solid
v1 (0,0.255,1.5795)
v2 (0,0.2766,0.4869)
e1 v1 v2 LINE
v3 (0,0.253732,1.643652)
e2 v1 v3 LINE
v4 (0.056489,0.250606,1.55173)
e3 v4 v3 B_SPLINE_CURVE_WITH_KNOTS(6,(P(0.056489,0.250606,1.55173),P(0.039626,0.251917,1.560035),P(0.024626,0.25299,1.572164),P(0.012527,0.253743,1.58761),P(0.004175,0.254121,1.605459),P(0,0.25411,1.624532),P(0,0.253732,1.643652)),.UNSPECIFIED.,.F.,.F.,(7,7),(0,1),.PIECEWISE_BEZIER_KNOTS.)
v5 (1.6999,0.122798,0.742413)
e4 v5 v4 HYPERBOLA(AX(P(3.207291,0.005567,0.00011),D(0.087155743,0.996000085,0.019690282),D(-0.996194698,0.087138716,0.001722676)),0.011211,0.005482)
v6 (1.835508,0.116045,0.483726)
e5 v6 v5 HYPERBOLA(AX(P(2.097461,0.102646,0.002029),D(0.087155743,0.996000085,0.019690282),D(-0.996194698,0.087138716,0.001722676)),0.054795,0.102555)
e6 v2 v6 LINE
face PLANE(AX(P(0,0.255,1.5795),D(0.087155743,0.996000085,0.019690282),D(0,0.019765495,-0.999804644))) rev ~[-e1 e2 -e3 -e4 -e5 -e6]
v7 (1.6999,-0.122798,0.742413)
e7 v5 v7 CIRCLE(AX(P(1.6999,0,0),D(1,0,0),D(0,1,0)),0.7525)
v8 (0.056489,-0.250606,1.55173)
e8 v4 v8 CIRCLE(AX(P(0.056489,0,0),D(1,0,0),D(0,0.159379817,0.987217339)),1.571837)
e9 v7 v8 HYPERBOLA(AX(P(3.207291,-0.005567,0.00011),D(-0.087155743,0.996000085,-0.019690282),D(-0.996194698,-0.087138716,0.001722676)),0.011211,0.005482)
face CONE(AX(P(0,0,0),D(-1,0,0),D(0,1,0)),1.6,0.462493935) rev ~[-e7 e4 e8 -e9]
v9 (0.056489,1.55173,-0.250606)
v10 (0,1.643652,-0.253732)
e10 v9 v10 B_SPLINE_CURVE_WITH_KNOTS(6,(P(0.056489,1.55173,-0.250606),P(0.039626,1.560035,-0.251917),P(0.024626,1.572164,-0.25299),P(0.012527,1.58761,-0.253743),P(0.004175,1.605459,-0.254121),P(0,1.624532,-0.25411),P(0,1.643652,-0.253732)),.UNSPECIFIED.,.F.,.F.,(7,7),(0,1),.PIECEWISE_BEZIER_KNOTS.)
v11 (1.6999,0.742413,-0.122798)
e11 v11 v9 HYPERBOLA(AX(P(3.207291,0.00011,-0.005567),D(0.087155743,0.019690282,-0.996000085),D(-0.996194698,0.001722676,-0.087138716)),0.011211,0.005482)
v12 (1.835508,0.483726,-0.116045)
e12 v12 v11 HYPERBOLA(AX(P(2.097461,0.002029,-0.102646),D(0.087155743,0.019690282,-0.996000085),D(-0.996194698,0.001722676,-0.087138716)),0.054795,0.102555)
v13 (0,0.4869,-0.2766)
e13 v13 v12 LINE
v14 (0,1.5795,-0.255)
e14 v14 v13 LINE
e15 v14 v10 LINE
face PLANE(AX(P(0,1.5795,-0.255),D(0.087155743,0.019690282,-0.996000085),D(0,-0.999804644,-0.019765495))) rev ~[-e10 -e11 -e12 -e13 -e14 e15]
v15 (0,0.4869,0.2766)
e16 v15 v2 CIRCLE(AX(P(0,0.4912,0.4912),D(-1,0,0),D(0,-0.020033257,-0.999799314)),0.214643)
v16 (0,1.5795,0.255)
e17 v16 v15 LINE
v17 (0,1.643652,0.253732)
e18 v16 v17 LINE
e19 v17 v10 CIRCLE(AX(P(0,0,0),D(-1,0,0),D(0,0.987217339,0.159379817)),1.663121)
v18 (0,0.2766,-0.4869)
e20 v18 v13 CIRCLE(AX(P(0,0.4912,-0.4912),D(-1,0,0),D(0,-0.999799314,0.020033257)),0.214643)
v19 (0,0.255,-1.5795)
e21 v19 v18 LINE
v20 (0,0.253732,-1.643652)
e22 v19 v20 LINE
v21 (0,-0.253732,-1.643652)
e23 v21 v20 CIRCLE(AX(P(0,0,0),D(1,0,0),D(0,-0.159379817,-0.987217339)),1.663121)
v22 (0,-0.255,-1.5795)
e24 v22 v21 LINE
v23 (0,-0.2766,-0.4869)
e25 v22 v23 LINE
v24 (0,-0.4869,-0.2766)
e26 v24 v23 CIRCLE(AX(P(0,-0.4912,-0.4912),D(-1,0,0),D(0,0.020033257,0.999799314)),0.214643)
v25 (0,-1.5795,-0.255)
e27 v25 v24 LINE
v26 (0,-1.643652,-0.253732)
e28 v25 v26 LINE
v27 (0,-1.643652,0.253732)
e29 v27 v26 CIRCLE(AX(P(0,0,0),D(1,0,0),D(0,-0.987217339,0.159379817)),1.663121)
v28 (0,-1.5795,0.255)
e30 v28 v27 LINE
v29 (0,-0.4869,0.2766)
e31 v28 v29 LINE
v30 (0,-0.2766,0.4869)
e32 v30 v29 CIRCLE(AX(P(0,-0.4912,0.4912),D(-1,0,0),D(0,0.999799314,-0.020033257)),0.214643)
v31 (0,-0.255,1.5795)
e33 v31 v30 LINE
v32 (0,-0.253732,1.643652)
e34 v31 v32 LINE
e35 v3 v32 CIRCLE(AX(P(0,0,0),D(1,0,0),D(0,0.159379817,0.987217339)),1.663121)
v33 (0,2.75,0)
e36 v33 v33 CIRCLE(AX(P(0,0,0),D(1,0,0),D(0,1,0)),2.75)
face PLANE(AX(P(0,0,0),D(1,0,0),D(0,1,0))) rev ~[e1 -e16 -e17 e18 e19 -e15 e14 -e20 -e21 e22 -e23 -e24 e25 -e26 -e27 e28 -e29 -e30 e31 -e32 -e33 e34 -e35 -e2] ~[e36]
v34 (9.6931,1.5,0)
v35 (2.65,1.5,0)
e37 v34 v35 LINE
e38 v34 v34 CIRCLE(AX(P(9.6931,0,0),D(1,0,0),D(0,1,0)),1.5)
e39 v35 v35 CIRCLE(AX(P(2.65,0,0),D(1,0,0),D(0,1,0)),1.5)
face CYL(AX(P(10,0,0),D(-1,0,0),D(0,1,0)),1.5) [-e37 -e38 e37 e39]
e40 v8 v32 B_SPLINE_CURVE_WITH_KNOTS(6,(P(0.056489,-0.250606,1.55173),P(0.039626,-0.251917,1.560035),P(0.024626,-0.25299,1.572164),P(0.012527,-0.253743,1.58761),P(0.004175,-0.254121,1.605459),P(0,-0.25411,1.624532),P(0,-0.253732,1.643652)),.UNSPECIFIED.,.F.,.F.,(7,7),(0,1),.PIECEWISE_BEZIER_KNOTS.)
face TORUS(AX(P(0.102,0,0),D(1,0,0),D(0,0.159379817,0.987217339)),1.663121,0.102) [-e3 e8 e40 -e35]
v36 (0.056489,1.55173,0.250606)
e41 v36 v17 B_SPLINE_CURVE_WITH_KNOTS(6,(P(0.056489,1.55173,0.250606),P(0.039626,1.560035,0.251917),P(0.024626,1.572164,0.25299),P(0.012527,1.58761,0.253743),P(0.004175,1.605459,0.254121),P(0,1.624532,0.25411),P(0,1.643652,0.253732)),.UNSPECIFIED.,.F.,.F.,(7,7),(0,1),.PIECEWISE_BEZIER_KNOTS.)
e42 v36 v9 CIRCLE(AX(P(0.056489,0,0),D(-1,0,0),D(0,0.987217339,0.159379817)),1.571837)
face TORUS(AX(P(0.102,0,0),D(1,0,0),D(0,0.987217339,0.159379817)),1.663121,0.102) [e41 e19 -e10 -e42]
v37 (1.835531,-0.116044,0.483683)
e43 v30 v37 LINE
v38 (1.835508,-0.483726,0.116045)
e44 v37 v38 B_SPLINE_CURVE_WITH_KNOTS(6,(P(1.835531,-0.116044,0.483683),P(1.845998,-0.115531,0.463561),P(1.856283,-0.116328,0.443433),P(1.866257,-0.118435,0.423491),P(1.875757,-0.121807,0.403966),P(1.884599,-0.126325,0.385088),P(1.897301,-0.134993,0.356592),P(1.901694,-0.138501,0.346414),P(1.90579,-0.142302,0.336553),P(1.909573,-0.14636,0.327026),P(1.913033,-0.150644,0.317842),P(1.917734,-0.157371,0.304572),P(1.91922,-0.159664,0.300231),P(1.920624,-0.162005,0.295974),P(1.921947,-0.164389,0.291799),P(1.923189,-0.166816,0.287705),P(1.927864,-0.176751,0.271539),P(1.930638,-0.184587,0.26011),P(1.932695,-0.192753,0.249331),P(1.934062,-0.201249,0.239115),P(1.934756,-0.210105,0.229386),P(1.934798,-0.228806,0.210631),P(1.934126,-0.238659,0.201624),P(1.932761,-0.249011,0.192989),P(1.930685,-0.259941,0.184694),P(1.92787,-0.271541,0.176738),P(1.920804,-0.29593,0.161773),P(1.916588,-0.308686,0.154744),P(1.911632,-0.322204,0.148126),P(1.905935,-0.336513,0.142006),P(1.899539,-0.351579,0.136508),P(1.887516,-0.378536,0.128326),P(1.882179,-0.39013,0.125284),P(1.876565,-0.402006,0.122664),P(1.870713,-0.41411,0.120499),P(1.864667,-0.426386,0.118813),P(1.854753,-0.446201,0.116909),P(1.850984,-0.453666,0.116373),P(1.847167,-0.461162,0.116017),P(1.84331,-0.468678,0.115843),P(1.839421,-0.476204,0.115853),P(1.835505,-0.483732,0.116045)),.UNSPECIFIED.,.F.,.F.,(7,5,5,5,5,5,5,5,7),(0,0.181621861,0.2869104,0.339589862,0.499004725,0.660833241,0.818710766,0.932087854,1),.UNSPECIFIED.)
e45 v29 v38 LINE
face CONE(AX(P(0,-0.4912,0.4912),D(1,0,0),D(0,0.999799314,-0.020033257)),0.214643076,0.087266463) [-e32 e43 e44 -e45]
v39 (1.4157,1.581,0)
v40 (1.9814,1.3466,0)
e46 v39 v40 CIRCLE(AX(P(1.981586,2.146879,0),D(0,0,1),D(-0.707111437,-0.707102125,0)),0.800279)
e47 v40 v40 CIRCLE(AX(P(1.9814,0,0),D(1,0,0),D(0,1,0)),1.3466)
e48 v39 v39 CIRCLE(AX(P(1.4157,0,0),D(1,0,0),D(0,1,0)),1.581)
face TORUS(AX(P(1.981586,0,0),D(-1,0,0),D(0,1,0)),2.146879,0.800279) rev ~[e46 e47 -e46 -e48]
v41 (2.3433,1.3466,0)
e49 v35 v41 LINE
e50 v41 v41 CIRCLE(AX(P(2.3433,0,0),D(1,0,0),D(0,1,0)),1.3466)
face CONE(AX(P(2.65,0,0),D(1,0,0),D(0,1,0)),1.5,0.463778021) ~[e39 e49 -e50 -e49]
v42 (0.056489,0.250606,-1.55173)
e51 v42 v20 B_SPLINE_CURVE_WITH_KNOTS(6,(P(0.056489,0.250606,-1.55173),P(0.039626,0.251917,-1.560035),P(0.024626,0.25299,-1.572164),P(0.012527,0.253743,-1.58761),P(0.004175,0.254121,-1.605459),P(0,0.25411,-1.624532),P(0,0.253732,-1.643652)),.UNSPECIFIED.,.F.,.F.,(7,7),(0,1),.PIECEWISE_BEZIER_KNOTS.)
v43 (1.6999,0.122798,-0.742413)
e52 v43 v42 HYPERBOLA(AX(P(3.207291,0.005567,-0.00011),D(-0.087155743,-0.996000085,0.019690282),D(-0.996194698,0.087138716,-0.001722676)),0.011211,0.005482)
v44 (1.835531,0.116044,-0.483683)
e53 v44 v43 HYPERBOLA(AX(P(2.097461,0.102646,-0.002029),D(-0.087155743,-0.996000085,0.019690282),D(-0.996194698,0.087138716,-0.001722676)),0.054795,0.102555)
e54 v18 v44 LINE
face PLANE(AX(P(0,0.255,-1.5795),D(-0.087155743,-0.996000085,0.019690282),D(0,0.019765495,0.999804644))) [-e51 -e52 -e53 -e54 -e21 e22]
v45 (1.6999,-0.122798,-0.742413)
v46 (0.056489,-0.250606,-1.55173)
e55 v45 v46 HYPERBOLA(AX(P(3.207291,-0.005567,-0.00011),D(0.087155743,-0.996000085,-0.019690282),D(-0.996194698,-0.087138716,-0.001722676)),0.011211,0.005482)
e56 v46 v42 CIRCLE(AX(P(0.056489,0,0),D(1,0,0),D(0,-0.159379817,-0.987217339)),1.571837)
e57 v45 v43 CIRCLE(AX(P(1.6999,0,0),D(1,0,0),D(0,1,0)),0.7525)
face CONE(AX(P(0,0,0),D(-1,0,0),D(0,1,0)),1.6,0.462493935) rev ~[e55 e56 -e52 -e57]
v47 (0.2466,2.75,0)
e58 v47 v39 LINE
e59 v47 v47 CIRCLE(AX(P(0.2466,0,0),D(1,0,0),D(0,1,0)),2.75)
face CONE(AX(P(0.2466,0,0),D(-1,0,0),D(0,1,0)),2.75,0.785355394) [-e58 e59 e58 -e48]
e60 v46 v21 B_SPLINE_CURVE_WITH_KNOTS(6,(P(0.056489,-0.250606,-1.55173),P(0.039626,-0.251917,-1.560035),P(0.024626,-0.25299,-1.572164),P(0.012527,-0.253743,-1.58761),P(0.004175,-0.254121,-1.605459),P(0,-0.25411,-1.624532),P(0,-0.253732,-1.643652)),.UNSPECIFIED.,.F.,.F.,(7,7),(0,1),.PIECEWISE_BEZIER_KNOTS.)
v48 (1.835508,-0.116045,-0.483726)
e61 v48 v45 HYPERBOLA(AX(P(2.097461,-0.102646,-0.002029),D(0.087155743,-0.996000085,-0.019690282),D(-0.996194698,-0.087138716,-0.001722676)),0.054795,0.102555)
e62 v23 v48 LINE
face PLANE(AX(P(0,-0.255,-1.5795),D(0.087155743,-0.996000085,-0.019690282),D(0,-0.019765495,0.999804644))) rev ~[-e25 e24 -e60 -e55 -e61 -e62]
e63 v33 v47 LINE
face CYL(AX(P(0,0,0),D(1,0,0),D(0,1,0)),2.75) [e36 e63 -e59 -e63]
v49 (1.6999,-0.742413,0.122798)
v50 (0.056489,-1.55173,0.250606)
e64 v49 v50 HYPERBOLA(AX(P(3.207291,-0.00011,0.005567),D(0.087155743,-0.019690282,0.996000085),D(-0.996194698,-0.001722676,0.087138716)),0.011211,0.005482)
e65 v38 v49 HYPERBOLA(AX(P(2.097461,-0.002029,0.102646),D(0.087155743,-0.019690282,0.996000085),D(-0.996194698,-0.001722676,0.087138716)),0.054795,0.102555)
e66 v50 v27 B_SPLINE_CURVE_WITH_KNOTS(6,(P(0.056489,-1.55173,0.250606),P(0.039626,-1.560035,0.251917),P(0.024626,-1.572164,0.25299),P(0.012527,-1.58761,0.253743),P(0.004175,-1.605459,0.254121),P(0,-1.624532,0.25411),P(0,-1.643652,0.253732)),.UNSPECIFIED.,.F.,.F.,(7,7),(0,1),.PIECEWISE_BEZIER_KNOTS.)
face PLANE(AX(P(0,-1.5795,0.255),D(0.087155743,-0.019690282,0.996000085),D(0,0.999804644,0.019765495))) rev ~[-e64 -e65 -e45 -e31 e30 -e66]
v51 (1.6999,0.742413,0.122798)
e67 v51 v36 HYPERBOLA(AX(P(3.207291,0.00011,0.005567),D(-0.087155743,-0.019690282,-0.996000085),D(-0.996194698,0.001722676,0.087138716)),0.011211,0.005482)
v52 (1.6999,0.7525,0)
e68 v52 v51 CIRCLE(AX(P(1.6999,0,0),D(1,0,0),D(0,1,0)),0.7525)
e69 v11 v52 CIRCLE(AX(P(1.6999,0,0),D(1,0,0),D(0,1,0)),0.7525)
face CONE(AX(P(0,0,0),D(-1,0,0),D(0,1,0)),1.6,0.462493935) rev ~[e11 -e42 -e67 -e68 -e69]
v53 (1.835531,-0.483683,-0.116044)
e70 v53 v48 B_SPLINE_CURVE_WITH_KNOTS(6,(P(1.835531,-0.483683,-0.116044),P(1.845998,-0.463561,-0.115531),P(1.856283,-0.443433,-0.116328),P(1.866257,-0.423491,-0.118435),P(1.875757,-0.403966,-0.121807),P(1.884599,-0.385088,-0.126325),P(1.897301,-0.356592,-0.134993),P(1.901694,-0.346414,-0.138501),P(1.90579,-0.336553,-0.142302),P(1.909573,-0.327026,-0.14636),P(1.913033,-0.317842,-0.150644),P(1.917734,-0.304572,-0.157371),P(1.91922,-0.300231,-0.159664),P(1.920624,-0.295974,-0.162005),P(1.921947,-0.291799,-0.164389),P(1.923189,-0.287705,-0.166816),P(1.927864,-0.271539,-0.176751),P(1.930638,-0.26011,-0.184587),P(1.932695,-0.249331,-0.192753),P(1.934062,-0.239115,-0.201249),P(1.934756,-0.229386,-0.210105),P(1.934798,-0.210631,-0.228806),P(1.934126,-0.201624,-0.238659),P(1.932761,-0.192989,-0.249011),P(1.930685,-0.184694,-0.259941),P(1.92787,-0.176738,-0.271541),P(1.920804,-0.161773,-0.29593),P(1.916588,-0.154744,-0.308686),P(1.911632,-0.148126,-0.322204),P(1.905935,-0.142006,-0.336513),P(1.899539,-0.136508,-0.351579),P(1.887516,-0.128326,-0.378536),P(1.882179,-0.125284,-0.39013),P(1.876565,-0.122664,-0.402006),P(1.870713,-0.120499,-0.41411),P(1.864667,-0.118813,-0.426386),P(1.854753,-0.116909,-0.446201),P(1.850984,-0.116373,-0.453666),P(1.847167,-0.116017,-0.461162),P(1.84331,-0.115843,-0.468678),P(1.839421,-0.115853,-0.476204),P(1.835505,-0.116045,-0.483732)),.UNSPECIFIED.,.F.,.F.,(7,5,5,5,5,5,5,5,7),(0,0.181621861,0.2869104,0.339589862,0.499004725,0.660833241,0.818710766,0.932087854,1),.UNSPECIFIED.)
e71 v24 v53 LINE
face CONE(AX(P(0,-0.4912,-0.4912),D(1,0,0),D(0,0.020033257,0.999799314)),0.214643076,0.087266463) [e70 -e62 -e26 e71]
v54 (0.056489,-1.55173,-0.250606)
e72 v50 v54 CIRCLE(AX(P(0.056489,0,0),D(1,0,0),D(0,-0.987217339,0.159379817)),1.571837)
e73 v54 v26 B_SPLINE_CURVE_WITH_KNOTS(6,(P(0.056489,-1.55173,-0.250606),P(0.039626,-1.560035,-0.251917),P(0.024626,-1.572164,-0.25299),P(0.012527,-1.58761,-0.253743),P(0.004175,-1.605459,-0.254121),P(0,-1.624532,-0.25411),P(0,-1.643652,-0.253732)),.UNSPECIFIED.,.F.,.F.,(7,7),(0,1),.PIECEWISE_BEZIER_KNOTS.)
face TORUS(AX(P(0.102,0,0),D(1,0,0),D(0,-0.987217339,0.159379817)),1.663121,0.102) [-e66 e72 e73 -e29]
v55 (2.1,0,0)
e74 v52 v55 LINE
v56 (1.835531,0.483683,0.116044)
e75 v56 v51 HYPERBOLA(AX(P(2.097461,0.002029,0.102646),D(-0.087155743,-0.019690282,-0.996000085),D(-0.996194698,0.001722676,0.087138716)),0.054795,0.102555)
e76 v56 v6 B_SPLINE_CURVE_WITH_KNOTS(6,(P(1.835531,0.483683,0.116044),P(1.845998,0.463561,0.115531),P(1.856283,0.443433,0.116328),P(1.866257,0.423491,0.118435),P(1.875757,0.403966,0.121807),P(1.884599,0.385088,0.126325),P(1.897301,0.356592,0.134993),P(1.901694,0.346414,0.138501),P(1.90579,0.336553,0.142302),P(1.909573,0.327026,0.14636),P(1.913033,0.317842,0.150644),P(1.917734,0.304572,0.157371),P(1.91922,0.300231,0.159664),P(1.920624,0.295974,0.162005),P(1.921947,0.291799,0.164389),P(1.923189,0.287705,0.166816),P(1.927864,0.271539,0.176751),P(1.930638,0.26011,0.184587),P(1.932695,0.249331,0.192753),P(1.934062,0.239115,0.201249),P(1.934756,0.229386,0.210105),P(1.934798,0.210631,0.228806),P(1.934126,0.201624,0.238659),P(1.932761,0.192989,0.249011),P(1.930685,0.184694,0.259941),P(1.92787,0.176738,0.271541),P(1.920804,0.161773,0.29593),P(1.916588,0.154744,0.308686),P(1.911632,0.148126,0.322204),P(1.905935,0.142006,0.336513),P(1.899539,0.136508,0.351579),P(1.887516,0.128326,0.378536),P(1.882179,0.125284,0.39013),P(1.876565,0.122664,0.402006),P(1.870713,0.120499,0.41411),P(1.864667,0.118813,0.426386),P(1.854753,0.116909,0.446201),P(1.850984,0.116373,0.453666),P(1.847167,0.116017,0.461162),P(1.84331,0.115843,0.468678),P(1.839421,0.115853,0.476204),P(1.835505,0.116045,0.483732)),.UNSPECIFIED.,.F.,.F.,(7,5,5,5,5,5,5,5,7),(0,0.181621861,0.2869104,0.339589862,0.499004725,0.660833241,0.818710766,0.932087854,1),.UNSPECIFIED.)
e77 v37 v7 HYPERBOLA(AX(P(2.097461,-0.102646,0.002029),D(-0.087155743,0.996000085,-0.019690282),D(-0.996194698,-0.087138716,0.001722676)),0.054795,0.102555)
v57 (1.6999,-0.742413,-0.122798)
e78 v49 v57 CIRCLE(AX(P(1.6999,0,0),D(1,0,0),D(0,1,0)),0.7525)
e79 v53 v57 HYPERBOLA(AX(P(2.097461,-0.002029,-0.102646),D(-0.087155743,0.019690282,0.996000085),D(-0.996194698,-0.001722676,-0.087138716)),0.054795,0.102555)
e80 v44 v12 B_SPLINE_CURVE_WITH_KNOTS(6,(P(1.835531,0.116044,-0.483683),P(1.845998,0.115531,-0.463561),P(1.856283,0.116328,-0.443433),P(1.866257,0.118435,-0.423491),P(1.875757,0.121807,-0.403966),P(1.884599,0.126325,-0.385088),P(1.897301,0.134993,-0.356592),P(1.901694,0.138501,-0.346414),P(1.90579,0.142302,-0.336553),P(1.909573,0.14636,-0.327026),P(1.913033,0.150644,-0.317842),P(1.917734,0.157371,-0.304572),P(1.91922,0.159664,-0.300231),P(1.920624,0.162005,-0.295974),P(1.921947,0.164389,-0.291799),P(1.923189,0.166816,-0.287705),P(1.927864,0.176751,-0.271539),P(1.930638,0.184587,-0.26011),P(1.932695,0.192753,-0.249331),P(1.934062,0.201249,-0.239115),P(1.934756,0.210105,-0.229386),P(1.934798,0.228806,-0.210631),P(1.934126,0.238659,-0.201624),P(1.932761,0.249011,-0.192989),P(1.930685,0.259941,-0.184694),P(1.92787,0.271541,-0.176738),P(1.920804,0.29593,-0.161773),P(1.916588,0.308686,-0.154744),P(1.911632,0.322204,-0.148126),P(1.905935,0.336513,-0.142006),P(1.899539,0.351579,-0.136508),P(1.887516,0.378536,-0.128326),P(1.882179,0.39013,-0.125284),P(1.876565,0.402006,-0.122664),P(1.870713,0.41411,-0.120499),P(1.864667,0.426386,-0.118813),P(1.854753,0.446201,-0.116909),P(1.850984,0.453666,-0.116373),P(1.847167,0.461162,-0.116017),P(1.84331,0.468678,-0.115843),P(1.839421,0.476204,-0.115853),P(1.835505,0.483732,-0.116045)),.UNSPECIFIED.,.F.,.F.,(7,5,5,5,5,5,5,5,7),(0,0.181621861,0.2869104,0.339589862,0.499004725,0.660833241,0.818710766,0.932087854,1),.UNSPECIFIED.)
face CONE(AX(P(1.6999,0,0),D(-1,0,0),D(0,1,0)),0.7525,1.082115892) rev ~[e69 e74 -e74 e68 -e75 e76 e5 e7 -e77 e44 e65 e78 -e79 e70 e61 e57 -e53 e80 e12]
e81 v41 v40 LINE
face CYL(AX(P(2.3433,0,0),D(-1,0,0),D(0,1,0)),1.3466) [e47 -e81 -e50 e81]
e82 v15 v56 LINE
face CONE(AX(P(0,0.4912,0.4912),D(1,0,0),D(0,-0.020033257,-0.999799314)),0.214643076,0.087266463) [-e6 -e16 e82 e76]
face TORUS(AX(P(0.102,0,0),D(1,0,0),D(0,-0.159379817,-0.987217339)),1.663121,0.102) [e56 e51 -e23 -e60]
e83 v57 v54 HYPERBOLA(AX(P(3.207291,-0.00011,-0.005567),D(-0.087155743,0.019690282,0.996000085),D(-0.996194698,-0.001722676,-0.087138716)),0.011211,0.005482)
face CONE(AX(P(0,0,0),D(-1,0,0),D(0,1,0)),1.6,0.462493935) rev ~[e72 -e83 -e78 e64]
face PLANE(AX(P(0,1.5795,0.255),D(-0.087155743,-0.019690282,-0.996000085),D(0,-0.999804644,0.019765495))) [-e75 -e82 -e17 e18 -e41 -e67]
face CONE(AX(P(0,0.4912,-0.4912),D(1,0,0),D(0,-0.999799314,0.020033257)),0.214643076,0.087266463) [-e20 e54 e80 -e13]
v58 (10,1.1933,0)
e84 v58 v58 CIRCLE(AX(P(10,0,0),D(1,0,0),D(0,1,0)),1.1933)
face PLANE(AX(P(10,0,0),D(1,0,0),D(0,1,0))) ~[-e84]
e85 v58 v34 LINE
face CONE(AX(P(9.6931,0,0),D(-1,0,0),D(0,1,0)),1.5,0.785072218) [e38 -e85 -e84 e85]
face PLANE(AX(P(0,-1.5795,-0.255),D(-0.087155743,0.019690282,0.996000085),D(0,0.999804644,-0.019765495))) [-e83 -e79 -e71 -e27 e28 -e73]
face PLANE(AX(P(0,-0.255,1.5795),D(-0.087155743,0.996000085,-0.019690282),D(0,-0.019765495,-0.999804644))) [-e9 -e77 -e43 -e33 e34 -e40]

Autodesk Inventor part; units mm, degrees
ref_plane "YZ Plane" through (0, 0, 0) normal (1, 0, 0) x (0, 1, 0)
ref_plane "XZ Plane" through (0, 0, 0) normal (0, 1, 0) x (-1, 0, 0)
sketch "Sketch1" plane through (0, 0, 0) normal (0, 0, 1) x (1, 0, 0)
  line L0 (2.1, 0) -> (10, 0)
  line L1 (10, 0) -> (10, 1.5)
  line L2 (10, 1.5) -> (2.65, 1.5)
  line L3 (2.65, 1.5) -> (2.3433, 1.3466)
  line L4 (2.3433, 1.3466) -> (1.9814, 1.3466)
  line L5 (0, 2.75) -> (0, 1.6)
  line L6 (0, 1.6) -> (1.6999, 0.7525)
  line L7 (1.6999, 0.7525) -> (2.1, 0)
  line L8 (-2, 0) -> (12, 0) projected
  line L9 (0, -0.55) -> (0, 3.3) projected
  line L10 (0, 2.75) -> (0.2466, 2.75)
  line L11 (0.2466, 2.75) -> (1.4157, 1.581)
  line L12 (2.65, 1.5) -> (1.4966, 1.5) construction
  arc A0 (1.4157, 1.581) -> (1.9814, 1.3466) centre (1.9814, 2.1466) ccw
  point P0 (1.65, 1.3466)
  dimension "d1" = 7.35
  dimension "d2" = 3
  dimension "d3" = 2.6933
  dimension "d4" = 3.2
  dimension "d5" = 26.5
  dimension "d6" = 62
  dimension "d7" = 2.1
  dimension "d8" = 0.3067
  dimension "d12" = 5.5
  dimension "d13" = 45
  dimension "d15" = 10
  dimension "d24" = 1.65
  dimension "d93" = 0.8
revolve "Body" add sketch "Sketch1" angle 360 about axis through (2.1, 0, 0) along (1, 0, 0) contours L7 L6 L5 L10 L11 A0 L4 L3 L2 L1 L0
sketch "Sketch2" plane through (0, 0, 0) normal (-1, 0, 0) x (0, 0, 1)
  line L0 (0, 1.6) -> (0, 0) construction
  line L1 (0, 0) -> (1.6, 0) construction
  arc A0 (0.48, 0) -> (0, 0.48) centre (0, 0) ccw construction
  arc A1 (0.56, 0) -> (0, 0.56) centre (0, 0) ccw construction
  arc A2 (1.5795, 0.255) -> (0.255, 1.5795) centre (0, 0) ccw
  line L2 (0, 0) -> (1.1314, 1.1314) construction
  line L3 (0.255, 1.5795) -> (0.2766, 0.4869)
  line L4 (1.5795, 0.255) -> (0.4869, 0.2766)
  arc A3 (0.255, 1.5795) -> (0, 1.6) centre (0, 0) ccw
  arc A4 (1.6, 0) -> (1.5795, 0.255) centre (0, 0) ccw
  line L5 (0, -3.85) -> (0, 3.85) projected
  line L6 (-3.85, 0) -> (3.85, 0) projected
  arc A5 (0.255, -1.5795) -> (1.5795, -0.255) centre (0, 0) ccw
  line L7 (0.255, -1.5795) -> (0.2766, -0.4869)
  line L8 (1.5795, -0.255) -> (0.4869, -0.2766)
  arc A6 (0, -1.6) -> (0.255, -1.5795) centre (0, 0) ccw
  arc A7 (1.5795, -0.255) -> (1.6, 0) centre (0, 0) ccw
  arc A8 (-0.255, 1.5795) -> (-1.5795, 0.255) centre (0, 0) ccw
  line L9 (-0.255, 1.5795) -> (-0.2766, 0.4869)
  line L10 (-1.5795, 0.255) -> (-0.4869, 0.2766)
  arc A9 (0, 1.6) -> (-0.255, 1.5795) centre (0, 0) ccw
  arc A10 (-1.5795, 0.255) -> (-1.6, 0) centre (0, 0) ccw
  arc A11 (-0.255, -1.5795) -> (0, -1.6) centre (0, 0) ccw
  arc A12 (-1.5795, -0.255) -> (-0.255, -1.5795) centre (0, 0) ccw
  arc A13 (-1.6, 0) -> (-1.5795, -0.255) centre (0, 0) ccw
  line L11 (-1.5795, -0.255) -> (-0.4869, -0.2766)
  line L12 (-0.255, -1.5795) -> (-0.2766, -0.4869)
  arc A14 (0.2766, 0.4869) -> (0.4869, 0.2766) centre (0.4912, 0.4912) ccw
  arc A15 (0.4869, -0.2766) -> (0.2766, -0.4869) centre (0.4912, -0.4912) ccw
  arc A16 (-0.4869, 0.2766) -> (-0.2766, 0.4869) centre (-0.4912, 0.4912) ccw
  arc A17 (-0.2766, -0.4869) -> (-0.4869, -0.2766) centre (-0.4912, -0.4912) ccw
  point P0 (1.1314, -1.1314)
  point P1 (-1.1314, 1.1314)
  point P2 (-1.1314, -1.1314)
  dimension "d17" = 0.96
  dimension "d18" = 1.12
  dimension "d19" = 3.2
  dimension "d20" = 45
  dimension "d21" = 0.255
extrude "Slot" add sketch "Sketch2" against normal up to next draft 5 contours L4 A14 L3 A2 | A5 L7 A15 L8 | L9 A16 L10 A8 | A12 L11 A17 L12
fillet "Fillet1" radius 0.102 4 edges at (0, 1.6, 0) (0, 0, -1.6) (0, -1.6, 0) (0, 0, 1.6)
thread "Thread" size "M3x0.5" class "6g" standard "ISO Metric profile" length 7.35
chamfer "Chamfer1" distance 0.3067 distance2 0.3069 1 edges at (10, -1.5, 0) measured on face at (10, -0.5112, 0.3316)
ref_plane "Work Plane2" through (3.35, 0, 0) normal (0, 0, -1) x (1, 0, 0)
equation "\"d24\" = KOH"
equation "\"d17\" = 0.3 * SDM"
equation "\"d18\" = 0.35 * SDM"
equation "\"d19\" = SDM"
equation "\"d21\" = 0.5 * SBR"
equation "\"d1\" = GEL"
equation "\"d2\" = GD"
equation "\"d3\" = BDM"
equation "\"d4\" = SDM"
equation "\"d7\" = INTI"
equation "\"d8\" = GAL"
equation "\"d12\" = KOD"
equation "\"d13\" = 0.5 * SEWI"
equation "\"d15\" = NLG"
equation "\"d93\" = R"
equation "\"d23\" = 0.2 * SBR"
equation "\"d10\" = GEL"
equation "\"d25\" = -0.5 * SPD + 0.5 * GD"
equation "\"NLG\" = 10"
equation "\"GEL\" = 7.35"
equation "\"GAL\" = 0.61345 * PTC"
equation "\"SPD\" = NND - 1.2269 * PTC"
equation "\"KOD\" = 5.5"
equation "\"KOH\" = 1.65"
equation "\"SBR\" = 0.51"
equation "\"INTI\" = 2.1"
equation "\"SDM\" = 3.2"
equation "\"GD\" = NND"
equation "\"BDM\" = NND - GAL"
equation "\"SEWI\" = 90deg"
equation "\"d9\" = SDM"
equation "\"R\" = 0.8"
equation "\"GUL\" = 0.61345 * PTC"
equation "\"TOA\" = 30deg"
equation "\"EPV\" = 3.15"
equation "\"THREADDIA\" = 3"
equation "\"PTC\" = 0.5"
equation "\"NND\" = 3"
equation "\"GD1\" = THREADDIA - 1.2269 * PTC"
properties part number "ISO 7046-1  - M3 x 10 - 4.8 - H" material "Steel"
